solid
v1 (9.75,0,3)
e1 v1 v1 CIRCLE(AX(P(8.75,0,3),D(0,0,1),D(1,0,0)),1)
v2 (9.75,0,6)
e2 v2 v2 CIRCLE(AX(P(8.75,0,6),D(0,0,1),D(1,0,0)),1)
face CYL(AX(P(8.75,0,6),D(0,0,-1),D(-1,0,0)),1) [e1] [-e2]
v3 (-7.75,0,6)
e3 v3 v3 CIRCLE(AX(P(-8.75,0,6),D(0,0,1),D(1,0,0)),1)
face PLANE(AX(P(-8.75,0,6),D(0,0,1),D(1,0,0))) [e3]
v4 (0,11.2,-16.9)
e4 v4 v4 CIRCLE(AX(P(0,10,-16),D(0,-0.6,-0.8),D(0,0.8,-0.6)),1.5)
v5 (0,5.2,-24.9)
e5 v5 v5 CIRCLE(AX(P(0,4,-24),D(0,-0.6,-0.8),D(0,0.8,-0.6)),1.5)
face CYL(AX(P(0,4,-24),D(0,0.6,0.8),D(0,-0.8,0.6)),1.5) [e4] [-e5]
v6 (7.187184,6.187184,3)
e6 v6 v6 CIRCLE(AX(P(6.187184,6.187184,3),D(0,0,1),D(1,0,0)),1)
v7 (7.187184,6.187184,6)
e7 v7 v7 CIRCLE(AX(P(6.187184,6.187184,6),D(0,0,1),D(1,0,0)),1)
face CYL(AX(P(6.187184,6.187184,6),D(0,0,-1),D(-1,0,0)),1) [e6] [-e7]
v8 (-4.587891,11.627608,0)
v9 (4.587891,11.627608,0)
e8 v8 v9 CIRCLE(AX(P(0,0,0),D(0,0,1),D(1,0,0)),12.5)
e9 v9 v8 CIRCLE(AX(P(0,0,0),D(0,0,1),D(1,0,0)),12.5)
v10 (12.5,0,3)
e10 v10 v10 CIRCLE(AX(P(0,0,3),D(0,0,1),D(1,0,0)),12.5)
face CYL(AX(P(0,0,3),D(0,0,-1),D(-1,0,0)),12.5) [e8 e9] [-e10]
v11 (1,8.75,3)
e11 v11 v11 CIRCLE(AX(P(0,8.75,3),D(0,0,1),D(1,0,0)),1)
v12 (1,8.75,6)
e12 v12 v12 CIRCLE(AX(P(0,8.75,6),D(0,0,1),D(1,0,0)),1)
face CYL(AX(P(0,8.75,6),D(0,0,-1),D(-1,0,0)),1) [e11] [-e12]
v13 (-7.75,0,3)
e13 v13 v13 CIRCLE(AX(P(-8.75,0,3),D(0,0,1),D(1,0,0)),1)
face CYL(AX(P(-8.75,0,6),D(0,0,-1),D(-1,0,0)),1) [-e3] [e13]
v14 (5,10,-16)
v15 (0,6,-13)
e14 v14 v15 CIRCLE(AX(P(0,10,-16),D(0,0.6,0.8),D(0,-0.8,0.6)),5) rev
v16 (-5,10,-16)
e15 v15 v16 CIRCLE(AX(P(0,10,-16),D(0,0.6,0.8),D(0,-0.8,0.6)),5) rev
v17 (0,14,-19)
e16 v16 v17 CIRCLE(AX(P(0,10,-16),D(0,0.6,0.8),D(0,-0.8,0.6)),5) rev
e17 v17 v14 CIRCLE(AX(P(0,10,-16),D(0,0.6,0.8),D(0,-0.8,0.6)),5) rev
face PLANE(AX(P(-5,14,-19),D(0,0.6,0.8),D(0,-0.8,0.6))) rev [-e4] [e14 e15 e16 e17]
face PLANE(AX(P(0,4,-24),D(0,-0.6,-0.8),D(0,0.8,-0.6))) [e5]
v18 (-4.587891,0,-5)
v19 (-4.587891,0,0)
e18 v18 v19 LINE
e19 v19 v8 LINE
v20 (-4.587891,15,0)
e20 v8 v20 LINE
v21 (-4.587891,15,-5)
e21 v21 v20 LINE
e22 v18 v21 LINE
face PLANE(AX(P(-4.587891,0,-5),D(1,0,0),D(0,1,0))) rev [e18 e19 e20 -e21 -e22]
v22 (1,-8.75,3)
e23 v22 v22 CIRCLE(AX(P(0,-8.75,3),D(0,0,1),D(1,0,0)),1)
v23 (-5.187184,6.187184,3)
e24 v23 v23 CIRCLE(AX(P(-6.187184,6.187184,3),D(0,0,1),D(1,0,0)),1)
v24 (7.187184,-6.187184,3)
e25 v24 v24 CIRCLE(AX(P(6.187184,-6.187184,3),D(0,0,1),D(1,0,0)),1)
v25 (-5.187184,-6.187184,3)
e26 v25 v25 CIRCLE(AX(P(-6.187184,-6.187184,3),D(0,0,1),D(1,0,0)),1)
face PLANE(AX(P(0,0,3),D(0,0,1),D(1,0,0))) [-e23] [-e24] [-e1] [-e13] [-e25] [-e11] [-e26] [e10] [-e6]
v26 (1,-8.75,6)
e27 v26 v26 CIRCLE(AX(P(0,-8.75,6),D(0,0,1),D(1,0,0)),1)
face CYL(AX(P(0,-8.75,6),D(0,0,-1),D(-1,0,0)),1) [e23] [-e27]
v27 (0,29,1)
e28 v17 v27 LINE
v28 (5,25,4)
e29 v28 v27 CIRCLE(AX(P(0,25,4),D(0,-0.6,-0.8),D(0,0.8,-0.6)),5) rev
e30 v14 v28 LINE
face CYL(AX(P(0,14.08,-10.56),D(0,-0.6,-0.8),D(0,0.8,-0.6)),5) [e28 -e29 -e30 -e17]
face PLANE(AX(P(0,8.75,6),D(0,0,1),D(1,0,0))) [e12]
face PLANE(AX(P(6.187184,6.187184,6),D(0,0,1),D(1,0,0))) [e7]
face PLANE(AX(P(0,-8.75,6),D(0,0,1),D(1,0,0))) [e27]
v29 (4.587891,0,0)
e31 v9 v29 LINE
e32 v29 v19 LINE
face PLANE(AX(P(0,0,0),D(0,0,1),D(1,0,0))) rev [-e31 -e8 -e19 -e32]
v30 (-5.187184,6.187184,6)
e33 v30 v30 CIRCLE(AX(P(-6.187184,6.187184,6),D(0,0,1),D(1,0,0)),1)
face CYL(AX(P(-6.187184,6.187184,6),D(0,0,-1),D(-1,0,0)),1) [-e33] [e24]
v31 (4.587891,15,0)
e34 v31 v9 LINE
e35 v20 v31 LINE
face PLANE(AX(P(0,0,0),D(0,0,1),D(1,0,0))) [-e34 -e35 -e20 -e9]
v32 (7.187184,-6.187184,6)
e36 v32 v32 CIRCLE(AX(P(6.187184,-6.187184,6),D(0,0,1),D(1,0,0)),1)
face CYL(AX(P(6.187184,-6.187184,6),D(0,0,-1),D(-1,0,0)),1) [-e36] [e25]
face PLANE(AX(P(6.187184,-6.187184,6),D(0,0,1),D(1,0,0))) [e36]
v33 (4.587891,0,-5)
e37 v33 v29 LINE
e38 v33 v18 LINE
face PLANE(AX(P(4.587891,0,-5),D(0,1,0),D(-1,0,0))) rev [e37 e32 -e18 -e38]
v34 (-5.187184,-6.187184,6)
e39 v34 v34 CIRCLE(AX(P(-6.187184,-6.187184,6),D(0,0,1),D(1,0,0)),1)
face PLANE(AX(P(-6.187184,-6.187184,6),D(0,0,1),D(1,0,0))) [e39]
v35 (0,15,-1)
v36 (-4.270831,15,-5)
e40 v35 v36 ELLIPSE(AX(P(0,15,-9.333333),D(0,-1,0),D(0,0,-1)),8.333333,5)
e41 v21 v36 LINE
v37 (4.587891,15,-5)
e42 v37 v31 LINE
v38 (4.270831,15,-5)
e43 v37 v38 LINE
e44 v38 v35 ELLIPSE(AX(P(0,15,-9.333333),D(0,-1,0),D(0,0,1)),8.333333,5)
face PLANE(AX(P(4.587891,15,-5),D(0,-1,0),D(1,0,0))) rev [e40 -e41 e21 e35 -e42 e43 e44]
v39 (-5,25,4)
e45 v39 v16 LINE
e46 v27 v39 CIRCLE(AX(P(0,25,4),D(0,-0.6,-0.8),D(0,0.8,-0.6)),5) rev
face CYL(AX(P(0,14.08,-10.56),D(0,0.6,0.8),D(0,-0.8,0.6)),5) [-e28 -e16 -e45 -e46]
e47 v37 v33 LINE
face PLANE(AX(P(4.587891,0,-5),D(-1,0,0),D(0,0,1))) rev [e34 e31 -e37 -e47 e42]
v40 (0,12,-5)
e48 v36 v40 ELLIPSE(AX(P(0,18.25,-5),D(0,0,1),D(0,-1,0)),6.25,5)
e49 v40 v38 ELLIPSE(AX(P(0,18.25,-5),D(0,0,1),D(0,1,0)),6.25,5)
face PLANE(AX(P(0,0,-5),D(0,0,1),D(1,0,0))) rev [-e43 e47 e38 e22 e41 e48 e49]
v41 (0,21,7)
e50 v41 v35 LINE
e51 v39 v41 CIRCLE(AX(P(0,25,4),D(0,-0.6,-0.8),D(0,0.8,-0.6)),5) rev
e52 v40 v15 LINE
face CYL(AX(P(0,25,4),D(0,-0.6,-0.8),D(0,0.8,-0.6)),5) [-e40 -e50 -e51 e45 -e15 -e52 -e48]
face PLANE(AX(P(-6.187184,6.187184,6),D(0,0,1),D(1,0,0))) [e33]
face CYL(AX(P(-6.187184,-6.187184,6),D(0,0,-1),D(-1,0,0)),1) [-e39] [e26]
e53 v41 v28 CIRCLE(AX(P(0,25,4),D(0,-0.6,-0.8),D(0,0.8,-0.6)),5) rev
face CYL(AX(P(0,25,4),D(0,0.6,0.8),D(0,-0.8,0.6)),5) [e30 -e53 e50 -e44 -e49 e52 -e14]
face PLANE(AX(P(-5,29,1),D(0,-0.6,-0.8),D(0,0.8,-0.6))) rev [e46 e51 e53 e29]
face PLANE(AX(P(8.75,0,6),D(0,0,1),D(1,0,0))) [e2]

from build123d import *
from build123d.topology import SkipClean

# Parameters (mm, degrees)
SKIZZE2_R                       = 12.5
AUFSATZ_LINEAR_AUSTRAGEN1_DEPTH = 3
SKIZZE3_R                       = 1
AUFSATZ_LINEAR_AUSTRAGEN2_DEPTH = 3
SKIZZE4_W                       = 9.175781616
SKIZZE4_H                       = 15
AUFSATZ_LINEAR_AUSTRAGEN3_DEPTH = 5
SCHNITT_LINEAR_AUSTRAGEN1_DEPTH = 10
SKIZZE6_W                       = 10
SKIZZE6_H                       = 25
AUFSATZ_LINEAR_AUSTRAGEN4_DEPTH = 10
VERRUNDUNG1_R                   = 5
SKIZZE7_R                       = 1.5
AUFSATZ_LINEAR_AUSTRAGEN5_DEPTH = 10


with BuildPart() as part:
    # Skizze2 → Aufsatz-Linear austragen1 (new body)
    with BuildSketch(Plane.XY):
        Circle(SKIZZE2_R)
    extrude(amount=AUFSATZ_LINEAR_AUSTRAGEN1_DEPTH)

    # Skizze3 → Aufsatz-Linear austragen2 (add)
    with BuildSketch(Plane.XY.offset(3)):
        with Locations((0, 8.75)):
            Circle(SKIZZE3_R)
        with Locations((6.187184335, 6.187184335)):
            Circle(SKIZZE3_R)
        with Locations((8.75, 0)):
            Circle(SKIZZE3_R)
        with Locations((6.187184335, -6.187184335)):
            Circle(SKIZZE3_R)
        with Locations((0, -8.75)):
            Circle(SKIZZE3_R)
        with Locations((-6.187184335, -6.187184335)):
            Circle(SKIZZE3_R)
        with Locations((-8.75, 0)):
            Circle(SKIZZE3_R)
        with Locations((-6.187184335, 6.187184335)):
            Circle(SKIZZE3_R)
    extrude(amount=AUFSATZ_LINEAR_AUSTRAGEN2_DEPTH)

    # Skizze4 → Aufsatz-Linear austragen3 (add)
    with BuildSketch(Plane(origin=(0, 0, 0), x_dir=(-1, 0, 0), z_dir=(0, 0, -1))):
        with Locations((0, 7.5)):
            Rectangle(SKIZZE4_W, SKIZZE4_H)
    extrude(amount=AUFSATZ_LINEAR_AUSTRAGEN3_DEPTH)

    # Skizze5 → Schnitt-Linear austragen1 (cut)
    with BuildSketch(Plane(origin=(4.587890808, 0, 0), x_dir=(0, 0, -1), z_dir=(1, 0, 0))):
        Polygon((1, 15), (5, 15), (5, 12), align=None)
    extrude(amount=-SCHNITT_LINEAR_AUSTRAGEN1_DEPTH, mode=Mode.SUBTRACT)

    # Skizze6 → Aufsatz-Linear austragen4 (add)
    with BuildSketch(Plane(origin=(0, 10.08, -7.56), x_dir=(1, 0, 0), z_dir=(0, 0.8, -0.6000000000000001))):
        with Locations((0, -5.7)):
            Rectangle(SKIZZE6_W, SKIZZE6_H)
    extrude(amount=AUFSATZ_LINEAR_AUSTRAGEN4_DEPTH)

    # Verrundung1
    # the kernel refuses this fillet: 5 mm, written as the material it takes off along each edge
    with BuildSketch(Plane(origin=(5, 28.5, 17), x_dir=(0, 0.8, -0.6), z_dir=(0, -0.6000000000000001, -0.8))) as verrundung1_piece_1_section:
        with BuildLine():
            CenterArc((VERRUNDUNG1_R, -VERRUNDUNG1_R), VERRUNDUNG1_R, 90, 90)
            Line((0, -VERRUNDUNG1_R), (0, 0))
            Line((0, 0), (VERRUNDUNG1_R, 0))
        make_face()
    verrundung1_piece_1 = extrude(amount=50, mode=Mode.PRIVATE)
    verrundung1_piece_1 = split(verrundung1_piece_1, bisect_by=Plane(origin=(4.587890808, 18.932165371, 1.027012133), z_dir=(1, 0, 0)), keep=Keep.TOP, mode=Mode.PRIVATE)
    add(verrundung1_piece_1, mode=Mode.SUBTRACT)
    with BuildSketch(Plane(origin=(5, 28.5, 17), x_dir=(0, 0.8, -0.6), z_dir=(0, -0.6000000000000001, -0.8))) as verrundung1_piece_2_section:
        with BuildLine():
            CenterArc((VERRUNDUNG1_R, -VERRUNDUNG1_R), VERRUNDUNG1_R, 90, 90)
            Line((0, -VERRUNDUNG1_R), (0, 0))
            Line((0, 0), (VERRUNDUNG1_R, 0))
        make_face()
    verrundung1_piece_2 = extrude(amount=50, mode=Mode.PRIVATE)
    verrundung1_piece_2 = split(verrundung1_piece_2, bisect_by=Plane(origin=(3.559847319, 15, 2.011430888), z_dir=(0, 1, 0)), keep=Keep.TOP, mode=Mode.PRIVATE)
    add(verrundung1_piece_2, mode=Mode.SUBTRACT)
    with BuildSketch(Plane(origin=(5, 28.5, 17), x_dir=(0, 0.8, -0.6), z_dir=(0, -0.6000000000000001, -0.8))) as verrundung1_piece_3_section:
        with BuildLine():
            CenterArc((VERRUNDUNG1_R, -VERRUNDUNG1_R), VERRUNDUNG1_R, 90, 90)
            Line((0, -VERRUNDUNG1_R), (0, 0))
            Line((0, 0), (VERRUNDUNG1_R, 0))
        make_face()
    verrundung1_piece_3 = extrude(amount=50, mode=Mode.PRIVATE)
    verrundung1_piece_3 = split(verrundung1_piece_3, bisect_by=Plane(origin=(3.543313448, 9.872718636, -5), z_dir=(0, 0, -1)), keep=Keep.TOP, mode=Mode.PRIVATE)
    add(verrundung1_piece_3, mode=Mode.SUBTRACT)
    with BuildSketch(Plane(origin=(-5, -1.5, -23), x_dir=(0, 0.7999999999999999, -0.6000000000000001), z_dir=(0, 0.6000000000000001, 0.8))) as verrundung1_piece_4_section:
        with BuildLine():
            CenterArc((VERRUNDUNG1_R, -VERRUNDUNG1_R), VERRUNDUNG1_R, 90, 90)
            Line((0, -VERRUNDUNG1_R), (0, 0))
            Line((0, 0), (VERRUNDUNG1_R, 0))
        make_face()
    verrundung1_piece_4 = extrude(amount=50, mode=Mode.PRIVATE)
    verrundung1_piece_4 = split(verrundung1_piece_4, bisect_by=Plane(origin=(-4.807563365, 10.769431466, -5), z_dir=(0, 0, -1)), keep=Keep.TOP, mode=Mode.PRIVATE)
    add(verrundung1_piece_4, mode=Mode.SUBTRACT)
    with BuildSketch(Plane(origin=(-5, -1.5, -23), x_dir=(0, 0.7999999999999999, -0.6000000000000001), z_dir=(0, 0.6000000000000001, 0.8))) as verrundung1_piece_5_section:
        with BuildLine():
            CenterArc((VERRUNDUNG1_R, -VERRUNDUNG1_R), VERRUNDUNG1_R, 90, 90)
            Line((0, -VERRUNDUNG1_R), (0, 0))
            Line((0, 0), (VERRUNDUNG1_R, 0))
        make_face()
    verrundung1_piece_5 = extrude(amount=50, mode=Mode.PRIVATE)
    verrundung1_piece_5 = split(verrundung1_piece_5, bisect_by=Plane(origin=(-4.587890808, 14, -3.666666667), z_dir=(-1, 0, 0)), keep=Keep.TOP, mode=Mode.PRIVATE)
    add(verrundung1_piece_5, mode=Mode.SUBTRACT)
    with BuildSketch(Plane(origin=(-5, -1.5, -23), x_dir=(0, 0.7999999999999999, -0.6000000000000001), z_dir=(0, 0.6000000000000001, 0.8))) as verrundung1_piece_6_section:
        with BuildLine():
            CenterArc((VERRUNDUNG1_R, -VERRUNDUNG1_R), VERRUNDUNG1_R, 90, 90)
            Line((0, -VERRUNDUNG1_R), (0, 0))
            Line((0, 0), (VERRUNDUNG1_R, 0))
        make_face()
    verrundung1_piece_6 = extrude(amount=50, mode=Mode.PRIVATE)
    verrundung1_piece_6 = split(verrundung1_piece_6, bisect_by=Plane(origin=(-3.559847319, 15, 2.011430888), z_dir=(0, 1, 0)), keep=Keep.TOP, mode=Mode.PRIVATE)
    add(verrundung1_piece_6, mode=Mode.SUBTRACT)
    with BuildSketch(Plane(origin=(-5, 6.5, -29), x_dir=(0, -0.8, 0.6), z_dir=(0, 0.6000000000000001, 0.8)), Plane(origin=(5, 36.5, 11), x_dir=(0, -0.8, 0.6), z_dir=(0, -0.6000000000000001, -0.8))) as verrundung1_piece_7:
        with BuildLine():
            CenterArc((VERRUNDUNG1_R, VERRUNDUNG1_R), VERRUNDUNG1_R, 180, 90)
            Line((0, VERRUNDUNG1_R), (0, 0))
            Line((0, 0), (VERRUNDUNG1_R, 0))
        make_face()
    extrude(amount=50, mode=Mode.SUBTRACT)

    # Skizze7 → Aufsatz-Linear austragen5 (add)
    with SkipClean():  # the faces are left unmerged after this step: merging them gives an invalid solid
        with BuildSketch(Plane(origin=(0, -4.08, -5.44), x_dir=(-1, 0, 0), z_dir=(0, -0.6000000000000002, -0.7999999999999999))):
            with Locations(Location((0, 17.6, 0), (0, 0, 90))):
                Circle(SKIZZE7_R)
        extrude(amount=AUFSATZ_LINEAR_AUSTRAGEN5_DEPTH)


solid = part.part
